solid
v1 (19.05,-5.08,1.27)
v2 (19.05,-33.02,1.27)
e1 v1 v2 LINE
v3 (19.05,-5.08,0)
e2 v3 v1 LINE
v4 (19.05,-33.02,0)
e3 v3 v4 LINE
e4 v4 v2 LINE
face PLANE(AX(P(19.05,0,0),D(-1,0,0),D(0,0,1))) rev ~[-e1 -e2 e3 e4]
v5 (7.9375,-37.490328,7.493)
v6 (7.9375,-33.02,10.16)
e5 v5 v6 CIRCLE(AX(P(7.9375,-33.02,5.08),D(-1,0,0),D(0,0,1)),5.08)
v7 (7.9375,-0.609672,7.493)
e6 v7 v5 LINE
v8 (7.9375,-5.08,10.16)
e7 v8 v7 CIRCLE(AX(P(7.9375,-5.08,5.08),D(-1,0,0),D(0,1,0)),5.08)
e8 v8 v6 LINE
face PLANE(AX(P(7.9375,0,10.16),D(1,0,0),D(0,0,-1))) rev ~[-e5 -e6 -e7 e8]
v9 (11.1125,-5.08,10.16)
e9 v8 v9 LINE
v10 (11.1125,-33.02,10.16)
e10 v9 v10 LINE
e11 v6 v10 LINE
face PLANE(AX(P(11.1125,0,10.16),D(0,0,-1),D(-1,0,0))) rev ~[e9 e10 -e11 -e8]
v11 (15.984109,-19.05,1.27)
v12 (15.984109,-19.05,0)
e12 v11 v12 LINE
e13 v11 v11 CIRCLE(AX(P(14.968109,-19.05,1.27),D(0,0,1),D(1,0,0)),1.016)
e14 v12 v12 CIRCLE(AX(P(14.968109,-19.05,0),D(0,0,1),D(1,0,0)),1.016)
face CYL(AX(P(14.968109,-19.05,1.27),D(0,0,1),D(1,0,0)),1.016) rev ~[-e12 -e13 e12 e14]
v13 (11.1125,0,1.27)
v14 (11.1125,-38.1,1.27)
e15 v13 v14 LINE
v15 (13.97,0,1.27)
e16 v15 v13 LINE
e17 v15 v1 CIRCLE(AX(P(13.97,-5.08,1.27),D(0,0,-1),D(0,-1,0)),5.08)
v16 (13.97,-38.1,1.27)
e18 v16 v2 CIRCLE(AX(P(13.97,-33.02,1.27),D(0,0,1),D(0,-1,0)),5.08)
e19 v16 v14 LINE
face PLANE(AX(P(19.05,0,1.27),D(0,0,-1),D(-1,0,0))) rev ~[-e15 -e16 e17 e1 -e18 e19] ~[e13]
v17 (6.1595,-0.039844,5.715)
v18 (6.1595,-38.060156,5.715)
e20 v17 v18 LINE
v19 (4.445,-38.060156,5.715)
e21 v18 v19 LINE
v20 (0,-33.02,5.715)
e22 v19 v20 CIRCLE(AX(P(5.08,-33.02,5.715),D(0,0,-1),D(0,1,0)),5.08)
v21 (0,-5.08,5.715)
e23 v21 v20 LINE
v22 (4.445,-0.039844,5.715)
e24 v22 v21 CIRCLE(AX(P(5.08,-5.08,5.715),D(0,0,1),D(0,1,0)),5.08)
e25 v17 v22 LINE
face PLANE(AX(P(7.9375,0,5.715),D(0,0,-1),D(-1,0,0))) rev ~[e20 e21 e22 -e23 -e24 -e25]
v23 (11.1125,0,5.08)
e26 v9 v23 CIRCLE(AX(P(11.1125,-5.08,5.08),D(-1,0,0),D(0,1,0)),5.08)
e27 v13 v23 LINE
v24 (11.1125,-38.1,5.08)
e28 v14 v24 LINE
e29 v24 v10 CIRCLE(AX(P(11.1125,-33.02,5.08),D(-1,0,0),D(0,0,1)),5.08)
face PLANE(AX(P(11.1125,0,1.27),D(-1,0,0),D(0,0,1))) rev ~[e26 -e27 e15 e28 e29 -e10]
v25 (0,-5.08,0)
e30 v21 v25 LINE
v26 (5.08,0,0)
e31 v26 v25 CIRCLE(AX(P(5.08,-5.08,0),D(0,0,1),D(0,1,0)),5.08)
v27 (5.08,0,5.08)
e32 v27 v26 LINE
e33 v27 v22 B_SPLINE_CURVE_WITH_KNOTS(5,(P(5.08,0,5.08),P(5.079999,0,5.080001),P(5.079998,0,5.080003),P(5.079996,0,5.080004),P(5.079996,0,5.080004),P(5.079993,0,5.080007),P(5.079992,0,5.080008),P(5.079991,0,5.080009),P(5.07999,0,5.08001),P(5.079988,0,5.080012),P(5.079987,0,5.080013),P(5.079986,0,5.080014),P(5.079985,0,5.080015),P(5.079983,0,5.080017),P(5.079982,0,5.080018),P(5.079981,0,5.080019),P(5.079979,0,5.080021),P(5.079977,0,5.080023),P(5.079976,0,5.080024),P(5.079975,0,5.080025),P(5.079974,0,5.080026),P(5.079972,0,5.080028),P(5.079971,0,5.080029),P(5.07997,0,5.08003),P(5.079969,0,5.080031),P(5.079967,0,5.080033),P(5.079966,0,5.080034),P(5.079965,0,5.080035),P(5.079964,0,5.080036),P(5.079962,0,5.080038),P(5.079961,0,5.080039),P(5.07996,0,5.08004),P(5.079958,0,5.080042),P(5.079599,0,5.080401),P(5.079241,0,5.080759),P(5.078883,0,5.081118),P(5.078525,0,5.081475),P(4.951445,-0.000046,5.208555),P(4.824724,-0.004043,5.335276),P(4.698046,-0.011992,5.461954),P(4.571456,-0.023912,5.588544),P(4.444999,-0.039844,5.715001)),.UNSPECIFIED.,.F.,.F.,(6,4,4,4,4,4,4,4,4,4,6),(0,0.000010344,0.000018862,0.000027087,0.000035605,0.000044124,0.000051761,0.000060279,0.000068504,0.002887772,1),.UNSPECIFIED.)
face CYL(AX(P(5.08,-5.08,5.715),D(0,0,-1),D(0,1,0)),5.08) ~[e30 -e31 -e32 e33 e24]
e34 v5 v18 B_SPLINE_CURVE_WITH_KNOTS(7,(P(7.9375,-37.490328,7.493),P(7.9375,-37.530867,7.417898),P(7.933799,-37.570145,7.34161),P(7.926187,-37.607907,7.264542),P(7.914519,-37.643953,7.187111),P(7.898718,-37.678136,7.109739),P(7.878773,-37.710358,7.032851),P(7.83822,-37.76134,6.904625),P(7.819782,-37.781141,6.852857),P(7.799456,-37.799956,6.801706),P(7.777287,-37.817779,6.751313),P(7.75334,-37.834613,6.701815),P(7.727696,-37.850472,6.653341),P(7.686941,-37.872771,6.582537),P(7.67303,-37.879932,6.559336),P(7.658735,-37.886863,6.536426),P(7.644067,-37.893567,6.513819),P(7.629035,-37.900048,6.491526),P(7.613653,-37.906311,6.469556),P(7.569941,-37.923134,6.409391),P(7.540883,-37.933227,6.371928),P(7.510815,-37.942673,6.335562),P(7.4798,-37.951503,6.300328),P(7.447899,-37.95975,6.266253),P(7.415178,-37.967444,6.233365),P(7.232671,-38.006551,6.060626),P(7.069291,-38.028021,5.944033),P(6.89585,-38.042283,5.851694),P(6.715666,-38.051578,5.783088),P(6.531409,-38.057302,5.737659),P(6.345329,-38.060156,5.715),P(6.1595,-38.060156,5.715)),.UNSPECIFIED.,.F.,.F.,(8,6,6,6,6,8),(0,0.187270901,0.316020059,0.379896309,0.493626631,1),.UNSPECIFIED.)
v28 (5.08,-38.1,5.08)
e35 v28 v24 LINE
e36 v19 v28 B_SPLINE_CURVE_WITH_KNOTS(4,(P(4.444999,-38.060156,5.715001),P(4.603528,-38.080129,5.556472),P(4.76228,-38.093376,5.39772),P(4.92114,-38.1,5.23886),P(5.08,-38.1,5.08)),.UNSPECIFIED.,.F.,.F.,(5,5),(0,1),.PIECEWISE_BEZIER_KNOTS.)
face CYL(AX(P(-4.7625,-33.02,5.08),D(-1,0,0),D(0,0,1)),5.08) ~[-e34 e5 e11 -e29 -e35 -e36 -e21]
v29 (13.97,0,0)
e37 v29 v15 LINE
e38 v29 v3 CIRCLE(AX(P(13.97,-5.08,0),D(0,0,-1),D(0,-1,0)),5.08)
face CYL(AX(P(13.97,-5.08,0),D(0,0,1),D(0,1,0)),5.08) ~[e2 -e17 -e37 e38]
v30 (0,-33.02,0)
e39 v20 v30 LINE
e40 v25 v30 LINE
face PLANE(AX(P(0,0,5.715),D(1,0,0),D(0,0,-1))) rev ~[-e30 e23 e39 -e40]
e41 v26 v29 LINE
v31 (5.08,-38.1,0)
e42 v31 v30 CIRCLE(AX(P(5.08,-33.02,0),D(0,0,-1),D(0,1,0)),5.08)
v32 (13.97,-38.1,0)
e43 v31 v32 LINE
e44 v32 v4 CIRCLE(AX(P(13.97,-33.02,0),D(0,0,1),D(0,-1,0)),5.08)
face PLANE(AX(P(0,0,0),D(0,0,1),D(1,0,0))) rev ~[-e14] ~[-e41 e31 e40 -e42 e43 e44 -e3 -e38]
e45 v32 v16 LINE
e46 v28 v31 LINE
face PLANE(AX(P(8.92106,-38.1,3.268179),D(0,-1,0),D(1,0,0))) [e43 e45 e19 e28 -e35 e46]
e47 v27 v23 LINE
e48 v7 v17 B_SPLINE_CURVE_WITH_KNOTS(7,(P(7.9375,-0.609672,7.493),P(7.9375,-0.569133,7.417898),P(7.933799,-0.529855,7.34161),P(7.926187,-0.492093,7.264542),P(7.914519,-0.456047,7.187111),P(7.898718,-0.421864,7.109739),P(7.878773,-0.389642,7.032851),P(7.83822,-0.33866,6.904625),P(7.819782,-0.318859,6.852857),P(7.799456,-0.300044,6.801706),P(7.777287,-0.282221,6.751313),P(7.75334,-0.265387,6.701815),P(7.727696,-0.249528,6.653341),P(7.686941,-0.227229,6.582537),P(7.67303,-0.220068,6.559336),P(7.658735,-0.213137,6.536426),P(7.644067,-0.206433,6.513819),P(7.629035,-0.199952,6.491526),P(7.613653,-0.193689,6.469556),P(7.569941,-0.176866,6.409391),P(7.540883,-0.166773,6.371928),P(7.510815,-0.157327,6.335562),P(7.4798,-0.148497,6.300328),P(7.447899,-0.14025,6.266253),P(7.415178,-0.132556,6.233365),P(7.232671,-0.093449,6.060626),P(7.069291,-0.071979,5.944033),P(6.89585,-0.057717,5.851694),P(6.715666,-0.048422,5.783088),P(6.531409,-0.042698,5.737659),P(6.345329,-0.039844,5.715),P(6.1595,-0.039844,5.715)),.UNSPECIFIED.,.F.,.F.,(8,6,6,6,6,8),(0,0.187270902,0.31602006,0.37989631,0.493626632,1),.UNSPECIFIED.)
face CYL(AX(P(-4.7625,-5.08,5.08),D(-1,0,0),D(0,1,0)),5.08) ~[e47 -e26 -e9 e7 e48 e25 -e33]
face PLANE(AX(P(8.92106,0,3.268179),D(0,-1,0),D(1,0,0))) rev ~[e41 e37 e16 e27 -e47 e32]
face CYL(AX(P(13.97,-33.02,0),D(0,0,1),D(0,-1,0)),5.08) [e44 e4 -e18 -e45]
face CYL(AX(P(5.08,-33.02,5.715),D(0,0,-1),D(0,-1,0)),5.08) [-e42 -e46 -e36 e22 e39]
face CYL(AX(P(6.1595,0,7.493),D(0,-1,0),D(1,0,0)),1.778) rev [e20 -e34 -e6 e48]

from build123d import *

# Parameters (mm, degrees)
F1_DEPTH    = 38.1
F2_R        = 1.778
F3_R        = 5.08
F4_R        = 1.016
F5_DEPTH    = 25.4
F6_T1_DEPTH = 28.575


# Not quite as in the source:
# - a fillet or chamfer that OpenCascade refuses, or shapes differently, is made with other operations: its cross-section is extruded or revolved along the edge and cut away or added


with BuildPart() as f1:
    # F0 (on Front) → F1 (new body)
    with BuildSketch(Plane.XZ):
        Polygon((0, 5.715), (0, 0), (19.05, 0), (19.05, 1.27), (11.1125, 1.27), (11.1125, 10.16), (7.9375, 10.16), (7.9375, 5.715), align=None)
    extrude(amount=F1_DEPTH)

    # F2
    f2_edges = [f1.edges().sort_by_distance(p)[0] for p in [
        (7.9375, -19.05, 5.715),
    ]]
    fillet(f2_edges, radius=F2_R)

    # F3
    f3_edges = [f1.edges().sort_by_distance(p)[0] for p in [
        (19.05, -38.1, 0.635),
        (0, -38.1, 2.8575),
        (0, 0, 2.8575),
        (19.05, 0, 0.635),
    ]]
    fillet(f3_edges, radius=F3_R)

    # F4 (on face) → F5 (cut)
    with BuildSketch(Plane.XY.offset(1.27)):
        with Locations((14.9681093171, -19.05)):
            Circle(F4_R)
    extrude(amount=-F5_DEPTH, mode=Mode.SUBTRACT)

    # F6: fillet of radius 5.08 on 2 edges, made by hand

    # F6_s2 → F6_t1 (cut)
    with BuildSketch(Plane.YZ.offset(-4.7625)):
        with BuildLine():
            ThreePointArc((-33.02, 10.16), (-36.6121024484, 8.6721024484), (-38.1, 5.08))
            Line((-38.1, 5.08), (-38.1, 10.16))
            Line((-38.1, 10.16), (-33.02, 10.16))
        make_face()
        with BuildLine():
            ThreePointArc((0, 5.08), (-1.4878975516, 8.6721024484), (-5.08, 10.16))
            Line((-5.08, 10.16), (0, 10.16))
            Line((0, 10.16), (0, 5.08))
        make_face()
    extrude(amount=F6_T1_DEPTH, mode=Mode.SUBTRACT)


solid = f1.part
